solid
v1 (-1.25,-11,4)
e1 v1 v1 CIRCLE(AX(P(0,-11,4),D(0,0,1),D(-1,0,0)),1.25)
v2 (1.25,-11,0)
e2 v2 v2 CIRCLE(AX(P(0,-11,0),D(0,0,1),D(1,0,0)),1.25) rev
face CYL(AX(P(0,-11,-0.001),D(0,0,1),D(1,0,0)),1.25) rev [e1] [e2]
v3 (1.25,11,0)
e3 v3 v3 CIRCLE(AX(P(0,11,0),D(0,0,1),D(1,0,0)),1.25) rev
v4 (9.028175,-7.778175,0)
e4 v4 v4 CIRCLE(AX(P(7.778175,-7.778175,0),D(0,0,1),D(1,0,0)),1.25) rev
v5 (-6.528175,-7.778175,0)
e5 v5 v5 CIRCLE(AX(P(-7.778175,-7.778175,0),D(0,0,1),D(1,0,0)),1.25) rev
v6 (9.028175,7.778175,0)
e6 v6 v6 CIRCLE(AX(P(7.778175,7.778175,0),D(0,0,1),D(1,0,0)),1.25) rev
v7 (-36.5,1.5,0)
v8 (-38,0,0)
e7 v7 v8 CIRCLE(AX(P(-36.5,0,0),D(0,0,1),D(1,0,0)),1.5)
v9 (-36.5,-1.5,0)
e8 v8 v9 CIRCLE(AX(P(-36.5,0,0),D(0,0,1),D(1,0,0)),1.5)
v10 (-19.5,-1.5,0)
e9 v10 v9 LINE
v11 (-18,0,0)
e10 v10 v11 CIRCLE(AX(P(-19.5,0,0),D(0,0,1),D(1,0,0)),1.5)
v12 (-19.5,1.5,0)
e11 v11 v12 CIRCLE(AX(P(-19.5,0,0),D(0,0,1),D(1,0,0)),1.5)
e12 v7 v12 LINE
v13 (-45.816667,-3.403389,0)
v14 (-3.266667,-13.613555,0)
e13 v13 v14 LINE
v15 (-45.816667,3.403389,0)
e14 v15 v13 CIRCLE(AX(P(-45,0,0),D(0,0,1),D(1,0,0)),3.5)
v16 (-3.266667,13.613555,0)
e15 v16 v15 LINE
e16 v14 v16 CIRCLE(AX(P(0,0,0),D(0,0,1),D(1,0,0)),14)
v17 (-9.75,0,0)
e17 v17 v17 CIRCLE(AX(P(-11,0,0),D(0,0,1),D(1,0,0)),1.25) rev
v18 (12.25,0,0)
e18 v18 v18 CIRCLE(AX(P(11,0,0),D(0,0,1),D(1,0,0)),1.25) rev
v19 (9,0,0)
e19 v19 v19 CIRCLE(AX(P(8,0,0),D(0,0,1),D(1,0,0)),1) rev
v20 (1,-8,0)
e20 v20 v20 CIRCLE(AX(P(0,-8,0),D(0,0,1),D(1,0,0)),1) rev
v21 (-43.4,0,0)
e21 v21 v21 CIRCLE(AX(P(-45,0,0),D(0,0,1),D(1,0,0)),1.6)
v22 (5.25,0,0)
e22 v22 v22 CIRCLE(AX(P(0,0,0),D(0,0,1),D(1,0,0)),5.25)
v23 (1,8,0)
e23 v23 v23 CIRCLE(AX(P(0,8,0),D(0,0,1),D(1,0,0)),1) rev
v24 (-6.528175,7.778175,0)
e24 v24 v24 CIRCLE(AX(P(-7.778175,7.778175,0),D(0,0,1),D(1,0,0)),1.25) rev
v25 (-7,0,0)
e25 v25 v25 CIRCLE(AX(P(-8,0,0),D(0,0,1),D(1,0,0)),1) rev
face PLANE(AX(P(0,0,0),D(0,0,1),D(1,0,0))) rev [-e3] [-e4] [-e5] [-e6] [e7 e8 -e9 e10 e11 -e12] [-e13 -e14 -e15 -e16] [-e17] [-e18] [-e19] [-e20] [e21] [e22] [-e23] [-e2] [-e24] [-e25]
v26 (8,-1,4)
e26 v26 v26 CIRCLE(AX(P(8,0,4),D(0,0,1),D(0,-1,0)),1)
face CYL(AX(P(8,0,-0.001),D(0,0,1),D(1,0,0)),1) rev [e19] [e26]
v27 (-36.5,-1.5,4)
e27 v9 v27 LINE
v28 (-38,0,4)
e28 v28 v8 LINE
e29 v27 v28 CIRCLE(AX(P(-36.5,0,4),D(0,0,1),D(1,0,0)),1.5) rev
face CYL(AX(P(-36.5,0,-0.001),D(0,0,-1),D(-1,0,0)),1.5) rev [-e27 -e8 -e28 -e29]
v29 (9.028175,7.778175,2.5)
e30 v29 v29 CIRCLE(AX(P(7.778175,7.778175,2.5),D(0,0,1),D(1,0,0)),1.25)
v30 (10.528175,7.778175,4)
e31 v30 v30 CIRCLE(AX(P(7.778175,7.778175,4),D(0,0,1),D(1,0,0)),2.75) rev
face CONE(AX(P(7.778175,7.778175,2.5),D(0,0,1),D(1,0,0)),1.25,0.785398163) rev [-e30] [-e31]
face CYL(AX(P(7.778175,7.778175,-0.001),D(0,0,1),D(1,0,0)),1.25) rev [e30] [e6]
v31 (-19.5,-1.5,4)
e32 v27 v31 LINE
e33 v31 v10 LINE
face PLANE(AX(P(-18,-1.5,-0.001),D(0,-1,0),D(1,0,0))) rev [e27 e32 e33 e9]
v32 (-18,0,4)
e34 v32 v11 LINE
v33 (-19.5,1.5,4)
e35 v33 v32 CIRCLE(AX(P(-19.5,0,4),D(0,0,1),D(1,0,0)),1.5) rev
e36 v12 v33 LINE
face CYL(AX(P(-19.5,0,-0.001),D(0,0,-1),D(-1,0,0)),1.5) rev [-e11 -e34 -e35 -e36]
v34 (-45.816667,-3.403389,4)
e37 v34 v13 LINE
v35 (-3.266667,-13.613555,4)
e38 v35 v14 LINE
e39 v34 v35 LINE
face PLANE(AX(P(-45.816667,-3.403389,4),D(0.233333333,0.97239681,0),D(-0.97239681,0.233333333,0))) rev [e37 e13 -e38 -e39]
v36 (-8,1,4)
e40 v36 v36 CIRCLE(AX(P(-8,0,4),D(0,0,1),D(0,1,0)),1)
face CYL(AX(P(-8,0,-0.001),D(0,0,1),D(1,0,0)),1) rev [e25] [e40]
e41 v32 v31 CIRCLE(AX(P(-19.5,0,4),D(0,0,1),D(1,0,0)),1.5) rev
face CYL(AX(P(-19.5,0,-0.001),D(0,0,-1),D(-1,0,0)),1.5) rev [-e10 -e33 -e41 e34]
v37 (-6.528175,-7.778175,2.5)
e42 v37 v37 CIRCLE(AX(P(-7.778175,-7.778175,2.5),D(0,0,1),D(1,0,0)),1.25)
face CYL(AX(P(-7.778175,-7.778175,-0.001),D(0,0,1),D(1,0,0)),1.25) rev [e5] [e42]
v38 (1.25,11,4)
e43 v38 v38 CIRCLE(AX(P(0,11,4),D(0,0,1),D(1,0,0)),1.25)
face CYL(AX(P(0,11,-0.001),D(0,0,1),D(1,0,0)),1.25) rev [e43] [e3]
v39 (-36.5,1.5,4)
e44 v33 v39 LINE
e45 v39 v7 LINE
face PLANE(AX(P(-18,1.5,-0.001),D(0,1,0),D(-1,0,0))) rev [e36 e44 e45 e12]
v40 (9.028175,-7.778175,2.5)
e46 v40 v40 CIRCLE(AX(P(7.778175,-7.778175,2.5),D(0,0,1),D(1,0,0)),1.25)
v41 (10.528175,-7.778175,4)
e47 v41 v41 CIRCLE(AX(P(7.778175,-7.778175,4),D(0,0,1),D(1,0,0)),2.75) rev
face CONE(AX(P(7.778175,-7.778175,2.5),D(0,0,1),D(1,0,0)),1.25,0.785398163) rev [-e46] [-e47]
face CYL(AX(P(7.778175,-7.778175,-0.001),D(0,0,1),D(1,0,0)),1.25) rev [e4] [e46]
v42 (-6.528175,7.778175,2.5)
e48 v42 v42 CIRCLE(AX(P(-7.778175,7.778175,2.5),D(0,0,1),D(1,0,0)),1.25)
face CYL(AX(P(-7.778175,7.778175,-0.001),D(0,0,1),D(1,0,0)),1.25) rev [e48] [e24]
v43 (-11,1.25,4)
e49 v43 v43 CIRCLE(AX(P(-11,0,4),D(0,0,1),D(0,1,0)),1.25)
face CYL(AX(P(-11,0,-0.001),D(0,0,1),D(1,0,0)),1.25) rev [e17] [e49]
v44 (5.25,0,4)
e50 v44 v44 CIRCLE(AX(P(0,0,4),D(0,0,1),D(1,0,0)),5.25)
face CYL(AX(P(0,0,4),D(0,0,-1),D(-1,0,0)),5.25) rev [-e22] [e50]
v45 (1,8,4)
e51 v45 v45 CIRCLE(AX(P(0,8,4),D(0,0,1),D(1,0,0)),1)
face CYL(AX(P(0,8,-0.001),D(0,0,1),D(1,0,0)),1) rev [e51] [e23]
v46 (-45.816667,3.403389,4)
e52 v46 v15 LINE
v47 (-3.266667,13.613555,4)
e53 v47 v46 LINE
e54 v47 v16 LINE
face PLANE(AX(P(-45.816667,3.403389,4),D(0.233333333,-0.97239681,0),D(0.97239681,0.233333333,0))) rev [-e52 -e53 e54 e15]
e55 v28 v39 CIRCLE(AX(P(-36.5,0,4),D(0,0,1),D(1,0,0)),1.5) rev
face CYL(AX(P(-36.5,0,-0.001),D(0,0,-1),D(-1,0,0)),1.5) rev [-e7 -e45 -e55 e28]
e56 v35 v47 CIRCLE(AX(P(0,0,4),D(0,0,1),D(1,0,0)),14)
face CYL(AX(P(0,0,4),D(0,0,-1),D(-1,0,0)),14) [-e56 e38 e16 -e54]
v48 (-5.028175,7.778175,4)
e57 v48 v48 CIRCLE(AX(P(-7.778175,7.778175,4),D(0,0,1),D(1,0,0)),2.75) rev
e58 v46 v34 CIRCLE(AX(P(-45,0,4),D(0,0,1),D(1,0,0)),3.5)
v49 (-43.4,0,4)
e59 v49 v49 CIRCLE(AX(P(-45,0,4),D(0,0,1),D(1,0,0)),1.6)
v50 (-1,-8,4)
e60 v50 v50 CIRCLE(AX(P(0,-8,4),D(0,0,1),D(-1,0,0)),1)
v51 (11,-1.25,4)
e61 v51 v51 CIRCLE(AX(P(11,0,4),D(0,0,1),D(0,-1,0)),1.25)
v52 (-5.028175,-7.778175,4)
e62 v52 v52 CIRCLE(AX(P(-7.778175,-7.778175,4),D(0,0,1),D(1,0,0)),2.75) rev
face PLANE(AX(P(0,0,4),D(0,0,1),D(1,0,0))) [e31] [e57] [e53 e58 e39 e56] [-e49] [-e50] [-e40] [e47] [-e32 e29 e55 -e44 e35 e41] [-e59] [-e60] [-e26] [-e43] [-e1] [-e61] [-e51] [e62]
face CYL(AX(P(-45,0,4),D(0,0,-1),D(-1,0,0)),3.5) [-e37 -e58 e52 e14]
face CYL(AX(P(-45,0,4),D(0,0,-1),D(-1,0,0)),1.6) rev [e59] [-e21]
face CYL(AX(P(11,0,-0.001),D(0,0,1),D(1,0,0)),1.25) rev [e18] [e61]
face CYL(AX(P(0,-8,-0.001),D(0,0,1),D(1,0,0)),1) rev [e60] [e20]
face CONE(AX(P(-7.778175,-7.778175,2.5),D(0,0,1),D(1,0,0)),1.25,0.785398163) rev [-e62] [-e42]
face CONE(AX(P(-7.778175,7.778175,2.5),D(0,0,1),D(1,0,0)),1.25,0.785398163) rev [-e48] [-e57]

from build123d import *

# Parameters (mm, degrees)
SKETCH1_R           = 1.6
SKETCH1_R_2         = 5.25
BOSS_EXTRUDE1_DEPTH = 4
CUT_EXTRUDE1_REACH  = 52.638
SKETCH2_R           = 1
CIRPATTERN1_COUNT   = 4
CUT_EXTRUDE2_REACH  = 52.638
SKETCH3_R           = 1.25
CIRPATTERN2_COUNT   = 8
CHAMFER1_SIZE       = 1.5
CUT_EXTRUDE3_REACH  = 52.638
SKETCH4_W           = 20
SKETCH4_H           = 3
FILLET1_R           = 1.5


with BuildPart() as part:
    # Sketch1 → Boss-Extrude1 (new body)
    with BuildSketch(Plane.XY):
        with BuildLine():
            Line((-45.816666667, 3.403388834), (-3.266666667, 13.613555336))
            ThreePointArc((-3.266666667, 13.613555336), (14, 0), (-3.266666667, -13.613555336))
            Line((-3.266666667, -13.613555336), (-45.816666667, -3.403388834))
            ThreePointArc((-45.816666667, -3.403388834), (-48.5, 0), (-45.816666667, 3.403388834))
        make_face()
        with Locations((-45, 0)):
            Circle(SKETCH1_R, mode=Mode.SUBTRACT)
        Circle(SKETCH1_R_2, mode=Mode.SUBTRACT)
    extrude(amount=BOSS_EXTRUDE1_DEPTH)

    # Sketch2 → Cut-Extrude1 (cut, up to next)
    with BuildSketch(Plane.XY.offset(4), mode=Mode.PRIVATE) as cut_extrude1_sk1:
        with Locations((0, 8)):
            Circle(SKETCH2_R)
    cut_extrude1_tool1 = extrude(cut_extrude1_sk1.sketch, amount=-CUT_EXTRUDE1_REACH, mode=Mode.PRIVATE) & part.part
    cut_extrude1 = cut_extrude1_tool1.solids().sort_by_distance((0, 8, 4))[0]
    add(cut_extrude1, mode=Mode.SUBTRACT)

    # CirPattern1: Cut-Extrude1 ×4 about axis
    cirpattern1_axis = Axis((0, 0, 0), (0, 0, 1))
    for i in range(1, CIRPATTERN1_COUNT):
        add(cut_extrude1.rotate(cirpattern1_axis, i * 360 / CIRPATTERN1_COUNT), mode=Mode.SUBTRACT)

    # Sketch3 → Cut-Extrude2 (cut, up to next)
    with BuildSketch(Plane.XY.offset(4), mode=Mode.PRIVATE) as cut_extrude2_sk1:
        with Locations((0, 11)):
            Circle(SKETCH3_R)
    cut_extrude2_tool1 = extrude(cut_extrude2_sk1.sketch, amount=-CUT_EXTRUDE2_REACH, mode=Mode.PRIVATE) & part.part
    cut_extrude2 = cut_extrude2_tool1.solids().sort_by_distance((0, 11, 4))[0]
    add(cut_extrude2, mode=Mode.SUBTRACT)

    # CirPattern2: Cut-Extrude2 ×8 about axis
    cirpattern2_axis = Axis((0, 0, 0), (0, 0, 1))
    for i in range(1, CIRPATTERN2_COUNT):
        add(cut_extrude2.rotate(cirpattern2_axis, i * 360 / CIRPATTERN2_COUNT), mode=Mode.SUBTRACT)

    # Chamfer1
    chamfer1_edges = [part.edges().sort_by_distance(p)[0] for p in [
        (-6.894291117, -8.66205807, 4),
        (8.66205807, -6.894291117, 4),
        (6.894291117, 8.66205807, 4),
        (-8.66205807, 6.894291117, 4),
    ]]
    chamfer(chamfer1_edges, length=CHAMFER1_SIZE)

    # Sketch4 → Cut-Extrude3 (cut, up to next)
    with BuildSketch(Plane.XY.offset(4), mode=Mode.PRIVATE) as cut_extrude3_sk1:
        with Locations((-28, 0)):
            Rectangle(SKETCH4_W, SKETCH4_H)
    cut_extrude3_tool1 = extrude(cut_extrude3_sk1.sketch, amount=-CUT_EXTRUDE3_REACH, mode=Mode.PRIVATE) & part.part
    add(cut_extrude3_tool1.solids().sort_by_distance((-28, 0, 4))[0], mode=Mode.SUBTRACT)

    # Fillet1
    fillet1_edges = [part.edges().sort_by_distance(p)[0] for p in [
        (-18, -1.5, 2),
        (-18, 1.5, 2),
        (-38, 1.5, 2),
        (-38, -1.5, 2),
    ]]
    fillet(fillet1_edges, radius=FILLET1_R - 0.0001)  # a hair under: the kernel refuses the full size


solid = part.part
